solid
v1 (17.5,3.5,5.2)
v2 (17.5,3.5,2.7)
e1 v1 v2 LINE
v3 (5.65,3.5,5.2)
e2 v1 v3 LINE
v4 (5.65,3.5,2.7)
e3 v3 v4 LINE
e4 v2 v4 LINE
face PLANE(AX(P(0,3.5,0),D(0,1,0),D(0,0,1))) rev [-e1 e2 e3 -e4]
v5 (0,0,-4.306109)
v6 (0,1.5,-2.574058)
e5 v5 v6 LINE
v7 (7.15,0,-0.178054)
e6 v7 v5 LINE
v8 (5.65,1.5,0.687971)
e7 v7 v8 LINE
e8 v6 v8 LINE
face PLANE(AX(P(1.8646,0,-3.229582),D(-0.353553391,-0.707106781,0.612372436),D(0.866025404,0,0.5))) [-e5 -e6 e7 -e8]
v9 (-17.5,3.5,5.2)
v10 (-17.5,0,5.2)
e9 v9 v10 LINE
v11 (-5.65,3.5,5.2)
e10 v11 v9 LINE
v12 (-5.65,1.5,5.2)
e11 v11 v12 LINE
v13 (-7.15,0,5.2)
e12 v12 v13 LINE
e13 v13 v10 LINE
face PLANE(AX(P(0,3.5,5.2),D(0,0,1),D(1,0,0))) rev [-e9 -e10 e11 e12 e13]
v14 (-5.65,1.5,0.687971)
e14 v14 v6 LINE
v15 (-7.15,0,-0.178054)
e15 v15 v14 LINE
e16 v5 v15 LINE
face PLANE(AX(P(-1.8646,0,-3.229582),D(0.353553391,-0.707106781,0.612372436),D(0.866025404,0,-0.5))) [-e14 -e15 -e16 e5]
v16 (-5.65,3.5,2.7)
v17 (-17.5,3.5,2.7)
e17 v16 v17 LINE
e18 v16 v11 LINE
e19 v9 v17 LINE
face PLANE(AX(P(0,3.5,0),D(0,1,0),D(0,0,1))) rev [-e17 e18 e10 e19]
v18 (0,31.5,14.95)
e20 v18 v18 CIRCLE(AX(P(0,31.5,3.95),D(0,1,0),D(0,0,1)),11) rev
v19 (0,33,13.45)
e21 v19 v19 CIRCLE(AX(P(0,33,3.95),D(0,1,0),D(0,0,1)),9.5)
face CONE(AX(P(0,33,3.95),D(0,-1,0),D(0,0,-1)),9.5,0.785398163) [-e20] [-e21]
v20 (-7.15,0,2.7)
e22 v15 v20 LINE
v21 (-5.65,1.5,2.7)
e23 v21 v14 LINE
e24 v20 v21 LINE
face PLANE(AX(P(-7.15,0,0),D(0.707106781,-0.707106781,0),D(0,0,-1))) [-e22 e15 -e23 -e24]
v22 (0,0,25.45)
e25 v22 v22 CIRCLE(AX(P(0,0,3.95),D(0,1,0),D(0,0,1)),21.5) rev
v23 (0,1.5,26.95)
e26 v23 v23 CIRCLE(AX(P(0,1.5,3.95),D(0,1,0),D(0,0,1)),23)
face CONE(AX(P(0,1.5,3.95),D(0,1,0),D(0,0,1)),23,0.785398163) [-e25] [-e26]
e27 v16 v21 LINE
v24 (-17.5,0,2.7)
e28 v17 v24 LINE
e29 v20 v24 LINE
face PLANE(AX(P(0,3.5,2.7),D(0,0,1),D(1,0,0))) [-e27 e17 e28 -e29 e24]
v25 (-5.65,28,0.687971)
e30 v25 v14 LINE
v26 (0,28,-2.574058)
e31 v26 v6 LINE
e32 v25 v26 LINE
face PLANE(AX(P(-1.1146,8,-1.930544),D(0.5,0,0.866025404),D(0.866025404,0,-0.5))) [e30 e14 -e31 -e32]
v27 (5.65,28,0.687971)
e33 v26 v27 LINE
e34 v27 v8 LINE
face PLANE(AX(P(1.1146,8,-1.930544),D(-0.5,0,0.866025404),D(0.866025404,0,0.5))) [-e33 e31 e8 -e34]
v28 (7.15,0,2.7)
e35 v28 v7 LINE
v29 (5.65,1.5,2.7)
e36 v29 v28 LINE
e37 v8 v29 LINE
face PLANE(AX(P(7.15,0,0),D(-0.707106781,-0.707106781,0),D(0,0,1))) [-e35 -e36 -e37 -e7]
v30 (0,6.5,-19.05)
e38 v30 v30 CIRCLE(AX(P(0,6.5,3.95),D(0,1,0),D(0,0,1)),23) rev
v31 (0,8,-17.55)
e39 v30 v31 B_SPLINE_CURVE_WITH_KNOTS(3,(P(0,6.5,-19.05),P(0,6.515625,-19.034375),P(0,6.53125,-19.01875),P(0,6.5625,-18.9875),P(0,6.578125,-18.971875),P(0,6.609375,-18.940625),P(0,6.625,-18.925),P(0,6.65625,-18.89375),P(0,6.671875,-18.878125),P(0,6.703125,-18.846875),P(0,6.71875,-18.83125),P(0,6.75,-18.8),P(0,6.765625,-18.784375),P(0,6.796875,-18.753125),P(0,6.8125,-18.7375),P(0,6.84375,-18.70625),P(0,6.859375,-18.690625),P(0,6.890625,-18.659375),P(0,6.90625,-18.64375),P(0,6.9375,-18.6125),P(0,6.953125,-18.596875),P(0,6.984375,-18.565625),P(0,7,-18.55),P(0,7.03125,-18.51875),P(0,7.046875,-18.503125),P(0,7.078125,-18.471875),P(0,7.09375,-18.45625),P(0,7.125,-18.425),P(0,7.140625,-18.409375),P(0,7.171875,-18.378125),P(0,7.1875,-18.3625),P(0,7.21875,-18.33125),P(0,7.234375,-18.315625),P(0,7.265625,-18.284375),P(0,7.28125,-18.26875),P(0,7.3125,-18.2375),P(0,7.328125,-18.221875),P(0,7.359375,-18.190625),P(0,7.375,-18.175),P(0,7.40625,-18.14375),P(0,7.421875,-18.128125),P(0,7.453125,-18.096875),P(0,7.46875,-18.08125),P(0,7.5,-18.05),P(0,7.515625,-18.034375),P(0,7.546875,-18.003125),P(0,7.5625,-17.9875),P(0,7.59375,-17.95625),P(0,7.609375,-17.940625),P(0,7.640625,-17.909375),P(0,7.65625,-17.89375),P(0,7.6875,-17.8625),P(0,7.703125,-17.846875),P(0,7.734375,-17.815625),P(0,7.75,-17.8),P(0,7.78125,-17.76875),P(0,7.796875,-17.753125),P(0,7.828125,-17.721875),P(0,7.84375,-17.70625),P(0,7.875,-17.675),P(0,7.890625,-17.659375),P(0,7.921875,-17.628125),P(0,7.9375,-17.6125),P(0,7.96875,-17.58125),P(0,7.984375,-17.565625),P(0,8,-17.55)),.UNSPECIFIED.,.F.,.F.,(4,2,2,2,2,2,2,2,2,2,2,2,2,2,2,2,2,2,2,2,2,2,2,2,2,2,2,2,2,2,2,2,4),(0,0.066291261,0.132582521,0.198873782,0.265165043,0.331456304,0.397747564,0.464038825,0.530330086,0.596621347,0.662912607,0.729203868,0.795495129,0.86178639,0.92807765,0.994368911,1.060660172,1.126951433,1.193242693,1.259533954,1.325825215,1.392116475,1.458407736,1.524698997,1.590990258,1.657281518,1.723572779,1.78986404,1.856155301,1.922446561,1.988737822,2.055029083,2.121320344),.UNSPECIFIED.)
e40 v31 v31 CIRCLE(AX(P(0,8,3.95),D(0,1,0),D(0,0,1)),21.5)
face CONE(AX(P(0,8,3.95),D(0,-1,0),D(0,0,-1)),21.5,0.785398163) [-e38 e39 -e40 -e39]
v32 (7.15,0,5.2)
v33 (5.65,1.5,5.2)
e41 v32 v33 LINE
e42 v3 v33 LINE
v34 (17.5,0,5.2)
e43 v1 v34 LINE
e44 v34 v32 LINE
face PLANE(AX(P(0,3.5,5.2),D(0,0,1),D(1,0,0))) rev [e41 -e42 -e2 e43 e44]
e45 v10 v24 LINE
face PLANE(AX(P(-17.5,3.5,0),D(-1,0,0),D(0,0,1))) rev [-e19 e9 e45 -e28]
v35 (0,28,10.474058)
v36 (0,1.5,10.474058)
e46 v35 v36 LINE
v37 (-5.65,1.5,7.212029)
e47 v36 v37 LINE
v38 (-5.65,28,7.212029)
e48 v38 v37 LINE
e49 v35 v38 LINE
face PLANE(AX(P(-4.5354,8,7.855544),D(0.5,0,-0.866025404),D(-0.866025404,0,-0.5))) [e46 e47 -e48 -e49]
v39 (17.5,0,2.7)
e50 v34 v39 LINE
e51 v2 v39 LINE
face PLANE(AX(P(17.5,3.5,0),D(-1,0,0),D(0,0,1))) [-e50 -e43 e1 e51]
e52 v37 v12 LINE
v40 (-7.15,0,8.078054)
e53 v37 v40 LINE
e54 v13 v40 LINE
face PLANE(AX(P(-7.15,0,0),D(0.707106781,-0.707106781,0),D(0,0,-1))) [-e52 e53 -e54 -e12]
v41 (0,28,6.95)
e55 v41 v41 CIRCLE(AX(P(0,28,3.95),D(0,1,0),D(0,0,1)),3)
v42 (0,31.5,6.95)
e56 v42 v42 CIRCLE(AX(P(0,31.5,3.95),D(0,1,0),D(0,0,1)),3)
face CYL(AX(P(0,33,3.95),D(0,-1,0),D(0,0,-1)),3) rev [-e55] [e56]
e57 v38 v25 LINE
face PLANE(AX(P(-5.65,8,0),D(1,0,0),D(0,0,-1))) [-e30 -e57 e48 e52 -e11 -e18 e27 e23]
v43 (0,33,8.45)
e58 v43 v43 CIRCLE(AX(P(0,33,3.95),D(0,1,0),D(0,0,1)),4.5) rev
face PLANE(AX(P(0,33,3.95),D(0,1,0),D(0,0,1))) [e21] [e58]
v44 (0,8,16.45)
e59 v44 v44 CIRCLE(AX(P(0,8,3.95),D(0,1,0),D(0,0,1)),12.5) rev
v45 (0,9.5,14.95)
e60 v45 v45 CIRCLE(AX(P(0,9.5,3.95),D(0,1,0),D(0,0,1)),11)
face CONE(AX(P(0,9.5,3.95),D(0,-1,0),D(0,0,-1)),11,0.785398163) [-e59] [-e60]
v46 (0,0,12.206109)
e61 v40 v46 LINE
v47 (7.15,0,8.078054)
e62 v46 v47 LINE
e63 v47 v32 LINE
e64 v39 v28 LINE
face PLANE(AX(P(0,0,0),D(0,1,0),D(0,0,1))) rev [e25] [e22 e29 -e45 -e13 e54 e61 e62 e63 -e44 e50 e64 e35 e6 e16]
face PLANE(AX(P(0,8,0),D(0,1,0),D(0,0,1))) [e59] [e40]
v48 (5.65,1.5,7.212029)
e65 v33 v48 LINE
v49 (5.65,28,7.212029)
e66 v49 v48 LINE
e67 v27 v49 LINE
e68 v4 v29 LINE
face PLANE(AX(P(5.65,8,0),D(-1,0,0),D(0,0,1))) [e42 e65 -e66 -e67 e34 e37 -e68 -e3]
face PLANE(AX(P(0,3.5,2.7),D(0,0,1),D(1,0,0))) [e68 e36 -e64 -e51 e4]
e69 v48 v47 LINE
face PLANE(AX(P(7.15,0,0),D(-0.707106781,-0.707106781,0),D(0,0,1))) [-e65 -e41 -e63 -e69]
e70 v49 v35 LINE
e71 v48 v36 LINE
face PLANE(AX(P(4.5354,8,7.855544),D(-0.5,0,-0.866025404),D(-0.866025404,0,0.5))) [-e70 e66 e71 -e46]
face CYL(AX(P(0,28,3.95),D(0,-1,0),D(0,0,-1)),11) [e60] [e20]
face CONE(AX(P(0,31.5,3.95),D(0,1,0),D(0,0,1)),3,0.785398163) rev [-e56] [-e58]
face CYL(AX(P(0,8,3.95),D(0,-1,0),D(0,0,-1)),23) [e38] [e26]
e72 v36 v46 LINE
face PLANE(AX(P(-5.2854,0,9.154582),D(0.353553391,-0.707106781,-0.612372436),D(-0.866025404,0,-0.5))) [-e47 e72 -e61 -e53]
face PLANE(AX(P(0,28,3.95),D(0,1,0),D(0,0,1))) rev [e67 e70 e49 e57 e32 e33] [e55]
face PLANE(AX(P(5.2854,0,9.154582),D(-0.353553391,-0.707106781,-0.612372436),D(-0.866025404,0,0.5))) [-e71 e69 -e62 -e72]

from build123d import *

# Parameters (mm, degrees)
SKETCH1_R           = 23
SKETCH1_R_2         = 11
BOSS_EXTRUDE1_DEPTH = 8
CUT_EXTRUDE1_DEPTH  = 3.5
BOSS_EXTRUDE2_START = 8
BOSS_EXTRUDE2_DEPTH = 20
BOSS_EXTRUDE3_START = 28
BOSS_EXTRUDE3_DEPTH = 5
CHAMFER1_SIZE       = 1.5


with BuildPart() as part:
    # Sketch1 → Boss-Extrude1 (new body)
    # profile 1 of 7: a face of its own
    with BuildSketch(Plane(origin=(0, 0, 0), x_dir=(1, 0, 0), z_dir=(0, 1, 0))):
        with Locations(Location((0, -3.95, 0), (0, 0, 270))):
            Circle(SKETCH1_R)
        with Locations((0, -3.95)):
            Circle(SKETCH1_R_2, mode=Mode.SUBTRACT)
    # profile 2 of 7: a face of its own
    with BuildSketch(Plane(origin=(0, 0, 0), x_dir=(1, 0, 0), z_dir=(0, 1, 0))):
        with Locations((0, -3.95)):
            Circle(SKETCH1_R_2)
        Polygon((0, -10.474058042), (5.65, -7.212029021), (5.65, -0.687970979), (0, 2.574058042), (-5.65, -0.687970979), (-5.65, -7.212029021), align=None, mode=Mode.SUBTRACT)
    # profile 3 of 7: a face of its own
    with BuildSketch(Plane(origin=(0, 0, 0), x_dir=(1, 0, 0), z_dir=(0, 1, 0))):
        with BuildLine():
            Line((5.65, -5.2), (5.65, -7.212029021))
            Line((5.65, -7.212029021), (0, -10.474058042))
            Line((0, -10.474058042), (-5.65, -7.212029021))
            Line((-5.65, -7.212029021), (-5.65, -5.2))
            Line((-5.65, -5.2), (-10.928746497, -5.2))
            ThreePointArc((-10.928746497, -5.2), (0, -14.95), (10.928746497, -5.2))
            Line((10.928746497, -5.2), (5.65, -5.2))
        make_face()
    # profile 4 of 7: a face of its own
    with BuildSketch(Plane(origin=(0, 0, 0), x_dir=(1, 0, 0), z_dir=(0, 1, 0))):
        with BuildLine():
            Line((-17.5, -5.2), (-10.928746497, -5.2))
            ThreePointArc((-10.928746497, -5.2), (-11, -3.95), (-10.928746497, -2.7))
            Line((-10.928746497, -2.7), (-17.5, -2.7))
            Line((-17.5, -2.7), (-17.5, -5.2))
        make_face()
    # profile 5 of 7: a face of its own
    with BuildSketch(Plane(origin=(0, 0, 0), x_dir=(1, 0, 0), z_dir=(0, 1, 0))):
        with BuildLine():
            ThreePointArc((11, -3.95), (10.982172177, -4.576014589), (10.928746497, -5.2))
            Line((10.928746497, -5.2), (17.5, -5.2))
            Line((17.5, -5.2), (17.5, -2.7))
            Line((17.5, -2.7), (10.928746497, -2.7))
            ThreePointArc((10.928746497, -2.7), (10.982172177, -3.323985411), (11, -3.95))
        make_face()
    # profile 6 of 7: a face of its own
    with BuildSketch(Plane(origin=(0, 0, 0), x_dir=(1, 0, 0), z_dir=(0, 1, 0))):
        with BuildLine():
            Line((5.65, -2.7), (5.65, -5.2))
            Line((5.65, -5.2), (10.928746497, -5.2))
            ThreePointArc((10.928746497, -5.2), (10.982172177, -4.576014589), (11, -3.95))
            ThreePointArc((11, -3.95), (10.982172177, -3.323985411), (10.928746497, -2.7))
            Line((10.928746497, -2.7), (5.65, -2.7))
        make_face()
    # profile 7 of 7: a face of its own
    with BuildSketch(Plane(origin=(0, 0, 0), x_dir=(1, 0, 0), z_dir=(0, 1, 0))):
        with BuildLine():
            ThreePointArc((-10.928746497, -2.7), (-11, -3.95), (-10.928746497, -5.2))
            Line((-10.928746497, -5.2), (-5.65, -5.2))
            Line((-5.65, -5.2), (-5.65, -2.7))
            Line((-5.65, -2.7), (-10.928746497, -2.7))
        make_face()
    extrude(amount=BOSS_EXTRUDE1_DEPTH)

    # Sketch1<4> → Cut-Extrude1 (cut)
    with BuildSketch(Plane(origin=(0, 0, 0), x_dir=(1, 0, 0), z_dir=(0, 1, 0))):
        with BuildLine():
            Line((-17.5, -5.2), (-10.928746497, -5.2))
            ThreePointArc((-10.928746497, -5.2), (-11, -3.95), (-10.928746497, -2.7))
            Line((-10.928746497, -2.7), (-17.5, -2.7))
            Line((-17.5, -2.7), (-17.5, -5.2))
        make_face()
        with BuildLine():
            ThreePointArc((-10.928746497, -2.7), (-11, -3.95), (-10.928746497, -5.2))
            Line((-10.928746497, -5.2), (-5.65, -5.2))
            Line((-5.65, -5.2), (-5.65, -2.7))
            Line((-5.65, -2.7), (-10.928746497, -2.7))
        make_face()
        with BuildLine():
            Line((5.65, -2.7), (5.65, -5.2))
            Line((5.65, -5.2), (10.928746497, -5.2))
            ThreePointArc((10.928746497, -5.2), (10.982172177, -4.576014589), (11, -3.95))
            ThreePointArc((11, -3.95), (10.982172177, -3.323985411), (10.928746497, -2.7))
            Line((10.928746497, -2.7), (5.65, -2.7))
        make_face()
        with BuildLine():
            ThreePointArc((11, -3.95), (10.982172177, -4.576014589), (10.928746497, -5.2))
            Line((10.928746497, -5.2), (17.5, -5.2))
            Line((17.5, -5.2), (17.5, -2.7))
            Line((17.5, -2.7), (10.928746497, -2.7))
            ThreePointArc((10.928746497, -2.7), (10.982172177, -3.323985411), (11, -3.95))
        make_face()
    extrude(amount=CUT_EXTRUDE1_DEPTH, mode=Mode.SUBTRACT)

    # Sketch1<5> → Boss-Extrude2 (add)
    with BuildSketch(Plane(origin=(0, 0, 0), x_dir=(1, 0, 0), z_dir=(0, 1, 0)).offset(BOSS_EXTRUDE2_START)):
        with BuildLine():
            Line((5.65, -5.2), (5.65, -7.212029021))
            Line((5.65, -7.212029021), (0, -10.474058042))
            Line((0, -10.474058042), (-5.65, -7.212029021))
            Line((-5.65, -7.212029021), (-5.65, -5.2))
            Line((-5.65, -5.2), (-10.928746497, -5.2))
            ThreePointArc((-10.928746497, -5.2), (0, -14.95), (10.928746497, -5.2))
            Line((10.928746497, -5.2), (5.65, -5.2))
        make_face()
        with BuildLine():
            Line((5.65, -0.687970979), (5.65, -2.7))
            Line((5.65, -2.7), (10.928746497, -2.7))
            ThreePointArc((10.928746497, -2.7), (0, 7.05), (-10.928746497, -2.7))
            Line((-10.928746497, -2.7), (-5.65, -2.7))
            Line((-5.65, -2.7), (-5.65, -0.687970979))
            Line((-5.65, -0.687970979), (0, 2.574058042))
            Line((0, 2.574058042), (5.65, -0.687970979))
        make_face()
        with BuildLine():
            ThreePointArc((-10.928746497, -2.7), (-11, -3.95), (-10.928746497, -5.2))
            Line((-10.928746497, -5.2), (-5.65, -5.2))
            Line((-5.65, -5.2), (-5.65, -2.7))
            Line((-5.65, -2.7), (-10.928746497, -2.7))
        make_face()
        with BuildLine():
            Line((5.65, -2.7), (5.65, -5.2))
            Line((5.65, -5.2), (10.928746497, -5.2))
            ThreePointArc((10.928746497, -5.2), (10.982172177, -4.576014589), (11, -3.95))
            ThreePointArc((11, -3.95), (10.982172177, -3.323985411), (10.928746497, -2.7))
            Line((10.928746497, -2.7), (5.65, -2.7))
        make_face()
    extrude(amount=BOSS_EXTRUDE2_DEPTH)

    # Sketch1<6> → Boss-Extrude3 (add)
    with BuildSketch(Plane(origin=(0, 0, 0), x_dir=(1, 0, 0), z_dir=(0, 1, 0)).offset(BOSS_EXTRUDE3_START)):
        with BuildLine():
            Line((5.65, -5.2), (5.65, -7.212029021))
            Line((5.65, -7.212029021), (0, -10.474058042))
            Line((0, -10.474058042), (-5.65, -7.212029021))
            Line((-5.65, -7.212029021), (-5.65, -5.2))
            Line((-5.65, -5.2), (-10.928746497, -5.2))
            ThreePointArc((-10.928746497, -5.2), (0, -14.95), (10.928746497, -5.2))
            Line((10.928746497, -5.2), (5.65, -5.2))
        make_face()
        with BuildLine():
            Line((0, -10.474058042), (5.65, -7.212029021))
            Line((5.65, -7.212029021), (5.65, -5.2))
            Line((5.65, -5.2), (2.727178029, -5.2))
            ThreePointArc((2.727178029, -5.2), (0, -6.95), (-2.727178029, -5.2))
            Line((-2.727178029, -5.2), (-5.65, -5.2))
            Line((-5.65, -5.2), (-5.65, -7.212029021))
            Line((-5.65, -7.212029021), (0, -10.474058042))
        make_face()
        with BuildLine():
            Line((2.727178029, -2.7), (5.65, -2.7))
            Line((5.65, -2.7), (5.65, -0.687970979))
            Line((5.65, -0.687970979), (0, 2.574058042))
            Line((0, 2.574058042), (-5.65, -0.687970979))
            Line((-5.65, -0.687970979), (-5.65, -2.7))
            Line((-5.65, -2.7), (-2.727178029, -2.7))
            ThreePointArc((-2.727178029, -2.7), (0, -0.95), (2.727178029, -2.7))
        make_face()
        with BuildLine():
            Line((5.65, -0.687970979), (5.65, -2.7))
            Line((5.65, -2.7), (10.928746497, -2.7))
            ThreePointArc((10.928746497, -2.7), (0, 7.05), (-10.928746497, -2.7))
            Line((-10.928746497, -2.7), (-5.65, -2.7))
            Line((-5.65, -2.7), (-5.65, -0.687970979))
            Line((-5.65, -0.687970979), (0, 2.574058042))
            Line((0, 2.574058042), (5.65, -0.687970979))
        make_face()
        with BuildLine():
            Line((5.65, -2.7), (5.65, -5.2))
            Line((5.65, -5.2), (10.928746497, -5.2))
            ThreePointArc((10.928746497, -5.2), (10.982172177, -4.576014589), (11, -3.95))
            ThreePointArc((11, -3.95), (10.982172177, -3.323985411), (10.928746497, -2.7))
            Line((10.928746497, -2.7), (5.65, -2.7))
        make_face()
        with BuildLine():
            ThreePointArc((-10.928746497, -2.7), (-11, -3.95), (-10.928746497, -5.2))
            Line((-10.928746497, -5.2), (-5.65, -5.2))
            Line((-5.65, -5.2), (-5.65, -2.7))
            Line((-5.65, -2.7), (-10.928746497, -2.7))
        make_face()
        with BuildLine():
            Line((2.727178029, -5.2), (5.65, -5.2))
            Line((5.65, -5.2), (5.65, -2.7))
            Line((5.65, -2.7), (2.727178029, -2.7))
            ThreePointArc((2.727178029, -2.7), (2.931001031, -3.310286817), (3, -3.95))
            ThreePointArc((3, -3.95), (2.931001031, -4.589713183), (2.727178029, -5.2))
        make_face()
        with BuildLine():
            Line((-5.65, -5.2), (-2.727178029, -5.2))
            ThreePointArc((-2.727178029, -5.2), (-3, -3.95), (-2.727178029, -2.7))
            Line((-2.727178029, -2.7), (-5.65, -2.7))
            Line((-5.65, -2.7), (-5.65, -5.2))
        make_face()
    extrude(amount=BOSS_EXTRUDE3_DEPTH)

    # Chamfer1
    # the kernel refuses this chamfer: 1.5 mm, written as the material it adds along each edge
    with BuildSketch(Plane(origin=(0, 8, 3.95), x_dir=(0.9935224088361082, 0, 0.11363636363636874), z_dir=(-0.11363636363636874, 0, 0.9935224088361082))) as chamfer1_piece_1:
        Polygon((11 + CHAMFER1_SIZE, 0), (11, CHAMFER1_SIZE), (11, 0), align=None)
    revolve(axis=Axis((0, 8, 3.95), (0, 1, 0)))
    # the kernel refuses this chamfer: 1.5 mm, written as the material it takes off along each edge
    with BuildSketch(Plane(origin=(-8.990714197, 0, 5.28326678), x_dir=(-0.4998109584556484, -0.027495876610586358, 0.8656979742248804), z_dir=(0.8660254037844387, 0, 0.49999999999999994))) as chamfer1_2_piece_1_section:
        Polygon((CHAMFER1_SIZE * 0.999621916911, -CHAMFER1_SIZE * 0.0274958766106), (-CHAMFER1_SIZE * 0.0274958766106, -CHAMFER1_SIZE * 0.999621916911), (0, 0), align=None)
    chamfer1_2_piece_1 = extrude(amount=14.239107006, mode=Mode.PRIVATE)
    chamfer1_2_piece_1 = split(chamfer1_2_piece_1, bisect_by=Plane(origin=(-5.65, 0.509507135, 9.247455904), z_dir=(1, 0, 0)), keep=Keep.TOP, mode=Mode.PRIVATE)
    chamfer1_2_piece_1 = split(chamfer1_2_piece_1, bisect_by=Plane(origin=(-1.762731388, 0.509507135, 11.491771483), z_dir=(-0.5000000000000003, 0, -0.8660254037844385)), keep=Keep.TOP, mode=Mode.PRIVATE)
    add(chamfer1_2_piece_1, mode=Mode.SUBTRACT)
    with BuildSketch(Plane(origin=(-3.340714197, 0, 12.402820283), x_dir=(0.49981095845564866, -0.02749587661058636, 0.86569797422488), z_dir=(0.8660254037844385, 0, -0.5000000000000003))) as chamfer1_2_piece_2_section:
        Polygon((CHAMFER1_SIZE * 0.999621916911, -CHAMFER1_SIZE * 0.0274958766106), (-CHAMFER1_SIZE * 0.0274958766106, -CHAMFER1_SIZE * 0.999621916911), (0, 0), align=None)
    chamfer1_2_piece_2 = extrude(amount=14.239107006, mode=Mode.PRIVATE)
    chamfer1_2_piece_2 = split(chamfer1_2_piece_2, bisect_by=Plane(origin=(5.65, 0.509507135, 9.247455904), z_dir=(-1, 0, 0)), keep=Keep.TOP, mode=Mode.PRIVATE)
    chamfer1_2_piece_2 = split(chamfer1_2_piece_2, bisect_by=Plane(origin=(1.762731388, 0.509507135, 11.491771483), z_dir=(0.49999999999999994, 0, -0.8660254037844387)), keep=Keep.TOP, mode=Mode.PRIVATE)
    add(chamfer1_2_piece_2, mode=Mode.SUBTRACT)
    with BuildSketch(Plane(origin=(5.65, 0, 11.069553503), x_dir=(0.9996219169112969, -0.027495876610586382, 0), z_dir=(0, 0, -1))) as chamfer1_2_piece_3_section:
        Polygon((CHAMFER1_SIZE * 0.999621916911, -CHAMFER1_SIZE * 0.0274958766106), (-CHAMFER1_SIZE * 0.0274958766106, -CHAMFER1_SIZE * 0.999621916911), (0, 0), align=None)
    chamfer1_2_piece_3 = extrude(amount=9.727077985, mode=Mode.PRIVATE)
    chamfer1_2_piece_3 = split(chamfer1_2_piece_3, bisect_by=Plane(origin=(7.340723273, 0.502588209, 6.235889484), z_dir=(-0.5000000000000003, 0, -0.8660254037844385)), keep=Keep.TOP, mode=Mode.PRIVATE)
    add(chamfer1_2_piece_3, mode=Mode.SUBTRACT)
    with BuildSketch(Plane(origin=(8.990714197, 0, 2.61673322), x_dir=(0.49981095845564816, -0.027495876610586365, -0.8656979742248805), z_dir=(-0.8660254037844388, 0, -0.4999999999999998))) as chamfer1_2_piece_4_section:
        Polygon((CHAMFER1_SIZE * 0.999621916911, -CHAMFER1_SIZE * 0.0274958766106), (-CHAMFER1_SIZE * 0.0274958766106, -CHAMFER1_SIZE * 0.999621916911), (0, 0), align=None)
    chamfer1_2_piece_4 = extrude(amount=14.239107006, mode=Mode.PRIVATE)
    chamfer1_2_piece_4 = split(chamfer1_2_piece_4, bisect_by=Plane(origin=(5.65, 0.509507135, -1.347455904), z_dir=(-1, 0, 0)), keep=Keep.TOP, mode=Mode.PRIVATE)
    chamfer1_2_piece_4 = split(chamfer1_2_piece_4, bisect_by=Plane(origin=(1.762731388, 0.509507135, -3.591771483), z_dir=(0.5000000000000001, 0, 0.8660254037844386)), keep=Keep.TOP, mode=Mode.PRIVATE)
    add(chamfer1_2_piece_4, mode=Mode.SUBTRACT)
    with BuildSketch(Plane(origin=(-5.65, 0, 1.342475518), x_dir=(-0.9996219169112969, -0.027495876610586382, 0), z_dir=(0, 0, 1))) as chamfer1_2_piece_5_section:
        Polygon((CHAMFER1_SIZE * 0.999621916911, -CHAMFER1_SIZE * 0.0274958766106), (-CHAMFER1_SIZE * 0.0274958766106, -CHAMFER1_SIZE * 0.999621916911), (0, 0), align=None)
    chamfer1_2_piece_5 = extrude(amount=9.727077985, mode=Mode.PRIVATE)
    chamfer1_2_piece_5 = split(chamfer1_2_piece_5, bisect_by=Plane(origin=(-7.340723273, 0.502588209, 6.235889484), z_dir=(0.49999999999999994, 0, -0.8660254037844387)), keep=Keep.TOP, mode=Mode.PRIVATE)
    add(chamfer1_2_piece_5, mode=Mode.SUBTRACT)
    with BuildSketch(Plane(origin=(5.65, 0, 6.557524482), x_dir=(0.9996219169112969, -0.027495876610586382, 0), z_dir=(0, 0, -1))) as chamfer1_2_piece_6_section:
        Polygon((CHAMFER1_SIZE * 0.999621916911, -CHAMFER1_SIZE * 0.0274958766106), (-CHAMFER1_SIZE * 0.0274958766106, -CHAMFER1_SIZE * 0.999621916911), (0, 0), align=None)
    chamfer1_2_piece_6 = extrude(amount=9.727077985, mode=Mode.PRIVATE)
    chamfer1_2_piece_6 = split(chamfer1_2_piece_6, bisect_by=Plane(origin=(7.340723273, 0.502588209, 1.664110516), z_dir=(-0.4999999999999998, 0, 0.8660254037844388)), keep=Keep.TOP, mode=Mode.PRIVATE)
    add(chamfer1_2_piece_6, mode=Mode.SUBTRACT)
    with BuildSketch(Plane(origin=(0, 8, 3.95), x_dir=(0, 0, 1), z_dir=(-1, 0, 0))) as chamfer1_2_piece_7:
        Polygon((23, -CHAMFER1_SIZE), (23 - CHAMFER1_SIZE, 0), (23, 0), align=None)
    revolve(axis=Axis((0, 8, 3.95), (0, 1, 0)), mode=Mode.SUBTRACT)
    with BuildSketch(Plane(origin=(0, 33, 3.95), x_dir=(-0.9935224088361069, 0, -0.1136363636363809), z_dir=(0.1136363636363809, 0, -0.9935224088361069))) as chamfer1_2_piece_8:
        Polygon((11, -CHAMFER1_SIZE), (11 - CHAMFER1_SIZE, 0), (11, 0), align=None)
    revolve(axis=Axis((0, 33, 3.95), (0, 1, 0)), mode=Mode.SUBTRACT)
    with BuildSketch(Plane(origin=(0, 33, 3.95), x_dir=(0.9090593428863087, 0, 0.4166666666666683), z_dir=(-0.4166666666666683, 0, 0.9090593428863087))) as chamfer1_2_piece_9:
        Polygon((3, -CHAMFER1_SIZE), (3 + CHAMFER1_SIZE, 0), (3, 0), align=None)
    revolve(axis=Axis((0, 33, 3.95), (0, 1, 0)), mode=Mode.SUBTRACT)
    with BuildSketch(Plane(origin=(0, 0, 3.95), x_dir=(0, 0, 1), z_dir=(-1, 0, 0))) as chamfer1_2_piece_10:
        Polygon((23, CHAMFER1_SIZE), (23 - CHAMFER1_SIZE, 0), (23, 0), align=None)
    revolve(axis=Axis((0, 0, 3.95), (0, 1, 0)), mode=Mode.SUBTRACT)
    with BuildSketch(Plane(origin=(3.340714197, 0, -4.502820283), x_dir=(-0.4998109584556485, -0.027495876610586382, -0.8656979742248803), z_dir=(-0.8660254037844386, 0, 0.5000000000000001))) as chamfer1_2_piece_11_section:
        Polygon((CHAMFER1_SIZE * 0.999621916911, -CHAMFER1_SIZE * 0.0274958766106), (-CHAMFER1_SIZE * 0.0274958766106, -CHAMFER1_SIZE * 0.999621916911), (0, 0), align=None)
    chamfer1_2_piece_11 = extrude(amount=14.239107006, mode=Mode.PRIVATE)
    chamfer1_2_piece_11 = split(chamfer1_2_piece_11, bisect_by=Plane(origin=(-1.762731388, 0.509507135, -3.591771483), z_dir=(-0.4999999999999998, 0, 0.8660254037844388)), keep=Keep.TOP, mode=Mode.PRIVATE)
    chamfer1_2_piece_11 = split(chamfer1_2_piece_11, bisect_by=Plane(origin=(-5.65, 0.509507135, -1.347455904), z_dir=(1, 0, 0)), keep=Keep.TOP, mode=Mode.PRIVATE)
    add(chamfer1_2_piece_11, mode=Mode.SUBTRACT)
    with BuildSketch(Plane(origin=(-5.65, 0, -3.169553503), x_dir=(-0.9996219169112969, -0.027495876610586382, 0), z_dir=(0, 0, 1))) as chamfer1_2_piece_12_section:
        Polygon((CHAMFER1_SIZE * 0.999621916911, -CHAMFER1_SIZE * 0.0274958766106), (-CHAMFER1_SIZE * 0.0274958766106, -CHAMFER1_SIZE * 0.999621916911), (0, 0), align=None)
    chamfer1_2_piece_12 = extrude(amount=9.727077985, mode=Mode.PRIVATE)
    chamfer1_2_piece_12 = split(chamfer1_2_piece_12, bisect_by=Plane(origin=(-7.340723273, 0.502588209, 1.664110516), z_dir=(0.5000000000000001, 0, 0.8660254037844386)), keep=Keep.TOP, mode=Mode.PRIVATE)
    add(chamfer1_2_piece_12, mode=Mode.SUBTRACT)
    with BuildSketch(Plane(origin=(-5.65, 0, 1.342475518), x_dir=(-0.9996219169112969, -0.027495876610586382, 0), z_dir=(0, 0, 1))) as chamfer1_2_piece_13a_section:
        Polygon((CHAMFER1_SIZE * 0.999621916911, -CHAMFER1_SIZE * 0.0274958766106), (-CHAMFER1_SIZE * 0.0274958766106, -CHAMFER1_SIZE * 0.999621916911), (0, 0), align=None)
    chamfer1_2_piece_13a = extrude(amount=9.727077985, mode=Mode.PRIVATE)
    chamfer1_2_piece_13a = split(chamfer1_2_piece_13a, bisect_by=Plane(origin=(-5.265097348, 0.484046156, 7.434252671), z_dir=(-0.49999999999999994, 0, 0.8660254037844387)), keep=Keep.TOP, mode=Mode.PRIVATE)
    with BuildSketch(Plane(origin=(-8.990714197, 0, 5.28326678), x_dir=(-0.4998109584556484, -0.027495876610586358, 0.8656979742248804), z_dir=(0.8660254037844387, 0, 0.49999999999999994))) as chamfer1_2_piece_13b_section:
        Polygon((CHAMFER1_SIZE * 0.999621916911, -CHAMFER1_SIZE * 0.0274958766106), (-CHAMFER1_SIZE * 0.0274958766106, -CHAMFER1_SIZE * 0.999621916911), (0, 0), align=None)
    chamfer1_2_piece_13b = extrude(amount=14.239107006, mode=Mode.PRIVATE)
    chamfer1_2_piece_13b = split(chamfer1_2_piece_13b, bisect_by=Plane(origin=(-5.65, 0.484046156, 6.767581721), z_dir=(-1, 0, 0)), keep=Keep.TOP, mode=Mode.PRIVATE)
    chamfer1_2_piece_13 = chamfer1_2_piece_13a & chamfer1_2_piece_13b
    add(chamfer1_2_piece_13, mode=Mode.SUBTRACT)
    with BuildSketch(Plane(origin=(-8.990714197, 0, 5.28326678), x_dir=(-0.4998109584556484, -0.027495876610586358, 0.8656979742248804), z_dir=(0.8660254037844387, 0, 0.49999999999999994))) as chamfer1_2_piece_14a_section:
        Polygon((CHAMFER1_SIZE * 0.999621916911, -CHAMFER1_SIZE * 0.0274958766106), (-CHAMFER1_SIZE * 0.0274958766106, -CHAMFER1_SIZE * 0.999621916911), (0, 0), align=None)
    chamfer1_2_piece_14a = extrude(amount=14.239107006, mode=Mode.PRIVATE)
    chamfer1_2_piece_14a = split(chamfer1_2_piece_14a, bisect_by=Plane(origin=(0.384902652, 0.484046156, 10.251834392), z_dir=(0.5000000000000003, 0, 0.8660254037844385)), keep=Keep.TOP, mode=Mode.PRIVATE)
    with BuildSketch(Plane(origin=(-3.340714197, 0, 12.402820283), x_dir=(0.49981095845564866, -0.02749587661058636, 0.86569797422488), z_dir=(0.8660254037844385, 0, -0.5000000000000003))) as chamfer1_2_piece_14b_section:
        Polygon((CHAMFER1_SIZE * 0.999621916911, -CHAMFER1_SIZE * 0.0274958766106), (-CHAMFER1_SIZE * 0.0274958766106, -CHAMFER1_SIZE * 0.999621916911), (0, 0), align=None)
    chamfer1_2_piece_14b = extrude(amount=14.239107006, mode=Mode.PRIVATE)
    chamfer1_2_piece_14b = split(chamfer1_2_piece_14b, bisect_by=Plane(origin=(-0.384902652, 0.484046156, 10.251834392), z_dir=(-0.49999999999999994, 0, 0.8660254037844387)), keep=Keep.TOP, mode=Mode.PRIVATE)
    chamfer1_2_piece_14 = chamfer1_2_piece_14a & chamfer1_2_piece_14b
    add(chamfer1_2_piece_14, mode=Mode.SUBTRACT)
    with BuildSketch(Plane(origin=(5.65, 0, 11.069553503), x_dir=(0.9996219169112969, -0.027495876610586382, 0), z_dir=(0, 0, -1))) as chamfer1_2_piece_15a_section:
        Polygon((CHAMFER1_SIZE * 0.999621916911, -CHAMFER1_SIZE * 0.0274958766106), (-CHAMFER1_SIZE * 0.0274958766106, -CHAMFER1_SIZE * 0.999621916911), (0, 0), align=None)
    chamfer1_2_piece_15a = extrude(amount=9.727077985, mode=Mode.PRIVATE)
    chamfer1_2_piece_15a = split(chamfer1_2_piece_15a, bisect_by=Plane(origin=(5.265097348, 0.484046156, 7.434252671), z_dir=(0.5000000000000003, 0, 0.8660254037844385)), keep=Keep.TOP, mode=Mode.PRIVATE)
    with BuildSketch(Plane(origin=(-3.340714197, 0, 12.402820283), x_dir=(0.49981095845564866, -0.02749587661058636, 0.86569797422488), z_dir=(0.8660254037844385, 0, -0.5000000000000003))) as chamfer1_2_piece_15b_section:
        Polygon((CHAMFER1_SIZE * 0.999621916911, -CHAMFER1_SIZE * 0.0274958766106), (-CHAMFER1_SIZE * 0.0274958766106, -CHAMFER1_SIZE * 0.999621916911), (0, 0), align=None)
    chamfer1_2_piece_15b = extrude(amount=14.239107006, mode=Mode.PRIVATE)
    chamfer1_2_piece_15b = split(chamfer1_2_piece_15b, bisect_by=Plane(origin=(5.65, 0.484046156, 6.767581721), z_dir=(1, 0, 0)), keep=Keep.TOP, mode=Mode.PRIVATE)
    chamfer1_2_piece_15 = chamfer1_2_piece_15a & chamfer1_2_piece_15b
    add(chamfer1_2_piece_15, mode=Mode.SUBTRACT)
    with BuildSketch(Plane(origin=(5.65, 0, 6.557524482), x_dir=(0.9996219169112969, -0.027495876610586382, 0), z_dir=(0, 0, -1))) as chamfer1_2_piece_16a_section:
        Polygon((CHAMFER1_SIZE * 0.999621916911, -CHAMFER1_SIZE * 0.0274958766106), (-CHAMFER1_SIZE * 0.0274958766106, -CHAMFER1_SIZE * 0.999621916911), (0, 0), align=None)
    chamfer1_2_piece_16a = extrude(amount=9.727077985, mode=Mode.PRIVATE)
    chamfer1_2_piece_16a = split(chamfer1_2_piece_16a, bisect_by=Plane(origin=(5.265097348, 0.484046156, 0.465747329), z_dir=(0.4999999999999998, 0, -0.8660254037844388)), keep=Keep.TOP, mode=Mode.PRIVATE)
    with BuildSketch(Plane(origin=(8.990714197, 0, 2.61673322), x_dir=(0.49981095845564816, -0.027495876610586365, -0.8656979742248805), z_dir=(-0.8660254037844388, 0, -0.4999999999999998))) as chamfer1_2_piece_16b_section:
        Polygon((CHAMFER1_SIZE * 0.999621916911, -CHAMFER1_SIZE * 0.0274958766106), (-CHAMFER1_SIZE * 0.0274958766106, -CHAMFER1_SIZE * 0.999621916911), (0, 0), align=None)
    chamfer1_2_piece_16b = extrude(amount=14.239107006, mode=Mode.PRIVATE)
    chamfer1_2_piece_16b = split(chamfer1_2_piece_16b, bisect_by=Plane(origin=(5.65, 0.484046156, 1.132418279), z_dir=(1, 0, 0)), keep=Keep.TOP, mode=Mode.PRIVATE)
    chamfer1_2_piece_16 = chamfer1_2_piece_16a & chamfer1_2_piece_16b
    add(chamfer1_2_piece_16, mode=Mode.SUBTRACT)
    with BuildSketch(Plane(origin=(8.990714197, 0, 2.61673322), x_dir=(0.49981095845564816, -0.027495876610586365, -0.8656979742248805), z_dir=(-0.8660254037844388, 0, -0.4999999999999998))) as chamfer1_2_piece_17a_section:
        Polygon((CHAMFER1_SIZE * 0.999621916911, -CHAMFER1_SIZE * 0.0274958766106), (-CHAMFER1_SIZE * 0.0274958766106, -CHAMFER1_SIZE * 0.999621916911), (0, 0), align=None)
    chamfer1_2_piece_17a = extrude(amount=14.239107006, mode=Mode.PRIVATE)
    chamfer1_2_piece_17a = split(chamfer1_2_piece_17a, bisect_by=Plane(origin=(-0.384902652, 0.484046156, -2.351834392), z_dir=(-0.5000000000000001, 0, -0.8660254037844386)), keep=Keep.TOP, mode=Mode.PRIVATE)
    with BuildSketch(Plane(origin=(3.340714197, 0, -4.502820283), x_dir=(-0.4998109584556485, -0.027495876610586382, -0.8656979742248803), z_dir=(-0.8660254037844386, 0, 0.5000000000000001))) as chamfer1_2_piece_17b_section:
        Polygon((CHAMFER1_SIZE * 0.999621916911, -CHAMFER1_SIZE * 0.0274958766106), (-CHAMFER1_SIZE * 0.0274958766106, -CHAMFER1_SIZE * 0.999621916911), (0, 0), align=None)
    chamfer1_2_piece_17b = extrude(amount=14.239107006, mode=Mode.PRIVATE)
    chamfer1_2_piece_17b = split(chamfer1_2_piece_17b, bisect_by=Plane(origin=(0.384902652, 0.484046156, -2.351834392), z_dir=(0.4999999999999998, 0, -0.8660254037844388)), keep=Keep.TOP, mode=Mode.PRIVATE)
    chamfer1_2_piece_17 = chamfer1_2_piece_17a & chamfer1_2_piece_17b
    add(chamfer1_2_piece_17, mode=Mode.SUBTRACT)
    with BuildSketch(Plane(origin=(3.340714197, 0, -4.502820283), x_dir=(-0.4998109584556485, -0.027495876610586382, -0.8656979742248803), z_dir=(-0.8660254037844386, 0, 0.5000000000000001))) as chamfer1_2_piece_18a_section:
        Polygon((CHAMFER1_SIZE * 0.999621916911, -CHAMFER1_SIZE * 0.0274958766106), (-CHAMFER1_SIZE * 0.0274958766106, -CHAMFER1_SIZE * 0.999621916911), (0, 0), align=None)
    chamfer1_2_piece_18a = extrude(amount=14.239107006, mode=Mode.PRIVATE)
    chamfer1_2_piece_18a = split(chamfer1_2_piece_18a, bisect_by=Plane(origin=(-5.65, 0.484046156, 1.132418279), z_dir=(-1, 0, 0)), keep=Keep.TOP, mode=Mode.PRIVATE)
    with BuildSketch(Plane(origin=(-5.65, 0, -3.169553503), x_dir=(-0.9996219169112969, -0.027495876610586382, 0), z_dir=(0, 0, 1))) as chamfer1_2_piece_18b_section:
        Polygon((CHAMFER1_SIZE * 0.999621916911, -CHAMFER1_SIZE * 0.0274958766106), (-CHAMFER1_SIZE * 0.0274958766106, -CHAMFER1_SIZE * 0.999621916911), (0, 0), align=None)
    chamfer1_2_piece_18b = extrude(amount=9.727077985, mode=Mode.PRIVATE)
    chamfer1_2_piece_18b = split(chamfer1_2_piece_18b, bisect_by=Plane(origin=(-5.265097348, 0.484046156, 0.465747329), z_dir=(-0.5000000000000001, 0, -0.8660254037844386)), keep=Keep.TOP, mode=Mode.PRIVATE)
    chamfer1_2_piece_18 = chamfer1_2_piece_18a & chamfer1_2_piece_18b
    add(chamfer1_2_piece_18, mode=Mode.SUBTRACT)


solid = part.part
